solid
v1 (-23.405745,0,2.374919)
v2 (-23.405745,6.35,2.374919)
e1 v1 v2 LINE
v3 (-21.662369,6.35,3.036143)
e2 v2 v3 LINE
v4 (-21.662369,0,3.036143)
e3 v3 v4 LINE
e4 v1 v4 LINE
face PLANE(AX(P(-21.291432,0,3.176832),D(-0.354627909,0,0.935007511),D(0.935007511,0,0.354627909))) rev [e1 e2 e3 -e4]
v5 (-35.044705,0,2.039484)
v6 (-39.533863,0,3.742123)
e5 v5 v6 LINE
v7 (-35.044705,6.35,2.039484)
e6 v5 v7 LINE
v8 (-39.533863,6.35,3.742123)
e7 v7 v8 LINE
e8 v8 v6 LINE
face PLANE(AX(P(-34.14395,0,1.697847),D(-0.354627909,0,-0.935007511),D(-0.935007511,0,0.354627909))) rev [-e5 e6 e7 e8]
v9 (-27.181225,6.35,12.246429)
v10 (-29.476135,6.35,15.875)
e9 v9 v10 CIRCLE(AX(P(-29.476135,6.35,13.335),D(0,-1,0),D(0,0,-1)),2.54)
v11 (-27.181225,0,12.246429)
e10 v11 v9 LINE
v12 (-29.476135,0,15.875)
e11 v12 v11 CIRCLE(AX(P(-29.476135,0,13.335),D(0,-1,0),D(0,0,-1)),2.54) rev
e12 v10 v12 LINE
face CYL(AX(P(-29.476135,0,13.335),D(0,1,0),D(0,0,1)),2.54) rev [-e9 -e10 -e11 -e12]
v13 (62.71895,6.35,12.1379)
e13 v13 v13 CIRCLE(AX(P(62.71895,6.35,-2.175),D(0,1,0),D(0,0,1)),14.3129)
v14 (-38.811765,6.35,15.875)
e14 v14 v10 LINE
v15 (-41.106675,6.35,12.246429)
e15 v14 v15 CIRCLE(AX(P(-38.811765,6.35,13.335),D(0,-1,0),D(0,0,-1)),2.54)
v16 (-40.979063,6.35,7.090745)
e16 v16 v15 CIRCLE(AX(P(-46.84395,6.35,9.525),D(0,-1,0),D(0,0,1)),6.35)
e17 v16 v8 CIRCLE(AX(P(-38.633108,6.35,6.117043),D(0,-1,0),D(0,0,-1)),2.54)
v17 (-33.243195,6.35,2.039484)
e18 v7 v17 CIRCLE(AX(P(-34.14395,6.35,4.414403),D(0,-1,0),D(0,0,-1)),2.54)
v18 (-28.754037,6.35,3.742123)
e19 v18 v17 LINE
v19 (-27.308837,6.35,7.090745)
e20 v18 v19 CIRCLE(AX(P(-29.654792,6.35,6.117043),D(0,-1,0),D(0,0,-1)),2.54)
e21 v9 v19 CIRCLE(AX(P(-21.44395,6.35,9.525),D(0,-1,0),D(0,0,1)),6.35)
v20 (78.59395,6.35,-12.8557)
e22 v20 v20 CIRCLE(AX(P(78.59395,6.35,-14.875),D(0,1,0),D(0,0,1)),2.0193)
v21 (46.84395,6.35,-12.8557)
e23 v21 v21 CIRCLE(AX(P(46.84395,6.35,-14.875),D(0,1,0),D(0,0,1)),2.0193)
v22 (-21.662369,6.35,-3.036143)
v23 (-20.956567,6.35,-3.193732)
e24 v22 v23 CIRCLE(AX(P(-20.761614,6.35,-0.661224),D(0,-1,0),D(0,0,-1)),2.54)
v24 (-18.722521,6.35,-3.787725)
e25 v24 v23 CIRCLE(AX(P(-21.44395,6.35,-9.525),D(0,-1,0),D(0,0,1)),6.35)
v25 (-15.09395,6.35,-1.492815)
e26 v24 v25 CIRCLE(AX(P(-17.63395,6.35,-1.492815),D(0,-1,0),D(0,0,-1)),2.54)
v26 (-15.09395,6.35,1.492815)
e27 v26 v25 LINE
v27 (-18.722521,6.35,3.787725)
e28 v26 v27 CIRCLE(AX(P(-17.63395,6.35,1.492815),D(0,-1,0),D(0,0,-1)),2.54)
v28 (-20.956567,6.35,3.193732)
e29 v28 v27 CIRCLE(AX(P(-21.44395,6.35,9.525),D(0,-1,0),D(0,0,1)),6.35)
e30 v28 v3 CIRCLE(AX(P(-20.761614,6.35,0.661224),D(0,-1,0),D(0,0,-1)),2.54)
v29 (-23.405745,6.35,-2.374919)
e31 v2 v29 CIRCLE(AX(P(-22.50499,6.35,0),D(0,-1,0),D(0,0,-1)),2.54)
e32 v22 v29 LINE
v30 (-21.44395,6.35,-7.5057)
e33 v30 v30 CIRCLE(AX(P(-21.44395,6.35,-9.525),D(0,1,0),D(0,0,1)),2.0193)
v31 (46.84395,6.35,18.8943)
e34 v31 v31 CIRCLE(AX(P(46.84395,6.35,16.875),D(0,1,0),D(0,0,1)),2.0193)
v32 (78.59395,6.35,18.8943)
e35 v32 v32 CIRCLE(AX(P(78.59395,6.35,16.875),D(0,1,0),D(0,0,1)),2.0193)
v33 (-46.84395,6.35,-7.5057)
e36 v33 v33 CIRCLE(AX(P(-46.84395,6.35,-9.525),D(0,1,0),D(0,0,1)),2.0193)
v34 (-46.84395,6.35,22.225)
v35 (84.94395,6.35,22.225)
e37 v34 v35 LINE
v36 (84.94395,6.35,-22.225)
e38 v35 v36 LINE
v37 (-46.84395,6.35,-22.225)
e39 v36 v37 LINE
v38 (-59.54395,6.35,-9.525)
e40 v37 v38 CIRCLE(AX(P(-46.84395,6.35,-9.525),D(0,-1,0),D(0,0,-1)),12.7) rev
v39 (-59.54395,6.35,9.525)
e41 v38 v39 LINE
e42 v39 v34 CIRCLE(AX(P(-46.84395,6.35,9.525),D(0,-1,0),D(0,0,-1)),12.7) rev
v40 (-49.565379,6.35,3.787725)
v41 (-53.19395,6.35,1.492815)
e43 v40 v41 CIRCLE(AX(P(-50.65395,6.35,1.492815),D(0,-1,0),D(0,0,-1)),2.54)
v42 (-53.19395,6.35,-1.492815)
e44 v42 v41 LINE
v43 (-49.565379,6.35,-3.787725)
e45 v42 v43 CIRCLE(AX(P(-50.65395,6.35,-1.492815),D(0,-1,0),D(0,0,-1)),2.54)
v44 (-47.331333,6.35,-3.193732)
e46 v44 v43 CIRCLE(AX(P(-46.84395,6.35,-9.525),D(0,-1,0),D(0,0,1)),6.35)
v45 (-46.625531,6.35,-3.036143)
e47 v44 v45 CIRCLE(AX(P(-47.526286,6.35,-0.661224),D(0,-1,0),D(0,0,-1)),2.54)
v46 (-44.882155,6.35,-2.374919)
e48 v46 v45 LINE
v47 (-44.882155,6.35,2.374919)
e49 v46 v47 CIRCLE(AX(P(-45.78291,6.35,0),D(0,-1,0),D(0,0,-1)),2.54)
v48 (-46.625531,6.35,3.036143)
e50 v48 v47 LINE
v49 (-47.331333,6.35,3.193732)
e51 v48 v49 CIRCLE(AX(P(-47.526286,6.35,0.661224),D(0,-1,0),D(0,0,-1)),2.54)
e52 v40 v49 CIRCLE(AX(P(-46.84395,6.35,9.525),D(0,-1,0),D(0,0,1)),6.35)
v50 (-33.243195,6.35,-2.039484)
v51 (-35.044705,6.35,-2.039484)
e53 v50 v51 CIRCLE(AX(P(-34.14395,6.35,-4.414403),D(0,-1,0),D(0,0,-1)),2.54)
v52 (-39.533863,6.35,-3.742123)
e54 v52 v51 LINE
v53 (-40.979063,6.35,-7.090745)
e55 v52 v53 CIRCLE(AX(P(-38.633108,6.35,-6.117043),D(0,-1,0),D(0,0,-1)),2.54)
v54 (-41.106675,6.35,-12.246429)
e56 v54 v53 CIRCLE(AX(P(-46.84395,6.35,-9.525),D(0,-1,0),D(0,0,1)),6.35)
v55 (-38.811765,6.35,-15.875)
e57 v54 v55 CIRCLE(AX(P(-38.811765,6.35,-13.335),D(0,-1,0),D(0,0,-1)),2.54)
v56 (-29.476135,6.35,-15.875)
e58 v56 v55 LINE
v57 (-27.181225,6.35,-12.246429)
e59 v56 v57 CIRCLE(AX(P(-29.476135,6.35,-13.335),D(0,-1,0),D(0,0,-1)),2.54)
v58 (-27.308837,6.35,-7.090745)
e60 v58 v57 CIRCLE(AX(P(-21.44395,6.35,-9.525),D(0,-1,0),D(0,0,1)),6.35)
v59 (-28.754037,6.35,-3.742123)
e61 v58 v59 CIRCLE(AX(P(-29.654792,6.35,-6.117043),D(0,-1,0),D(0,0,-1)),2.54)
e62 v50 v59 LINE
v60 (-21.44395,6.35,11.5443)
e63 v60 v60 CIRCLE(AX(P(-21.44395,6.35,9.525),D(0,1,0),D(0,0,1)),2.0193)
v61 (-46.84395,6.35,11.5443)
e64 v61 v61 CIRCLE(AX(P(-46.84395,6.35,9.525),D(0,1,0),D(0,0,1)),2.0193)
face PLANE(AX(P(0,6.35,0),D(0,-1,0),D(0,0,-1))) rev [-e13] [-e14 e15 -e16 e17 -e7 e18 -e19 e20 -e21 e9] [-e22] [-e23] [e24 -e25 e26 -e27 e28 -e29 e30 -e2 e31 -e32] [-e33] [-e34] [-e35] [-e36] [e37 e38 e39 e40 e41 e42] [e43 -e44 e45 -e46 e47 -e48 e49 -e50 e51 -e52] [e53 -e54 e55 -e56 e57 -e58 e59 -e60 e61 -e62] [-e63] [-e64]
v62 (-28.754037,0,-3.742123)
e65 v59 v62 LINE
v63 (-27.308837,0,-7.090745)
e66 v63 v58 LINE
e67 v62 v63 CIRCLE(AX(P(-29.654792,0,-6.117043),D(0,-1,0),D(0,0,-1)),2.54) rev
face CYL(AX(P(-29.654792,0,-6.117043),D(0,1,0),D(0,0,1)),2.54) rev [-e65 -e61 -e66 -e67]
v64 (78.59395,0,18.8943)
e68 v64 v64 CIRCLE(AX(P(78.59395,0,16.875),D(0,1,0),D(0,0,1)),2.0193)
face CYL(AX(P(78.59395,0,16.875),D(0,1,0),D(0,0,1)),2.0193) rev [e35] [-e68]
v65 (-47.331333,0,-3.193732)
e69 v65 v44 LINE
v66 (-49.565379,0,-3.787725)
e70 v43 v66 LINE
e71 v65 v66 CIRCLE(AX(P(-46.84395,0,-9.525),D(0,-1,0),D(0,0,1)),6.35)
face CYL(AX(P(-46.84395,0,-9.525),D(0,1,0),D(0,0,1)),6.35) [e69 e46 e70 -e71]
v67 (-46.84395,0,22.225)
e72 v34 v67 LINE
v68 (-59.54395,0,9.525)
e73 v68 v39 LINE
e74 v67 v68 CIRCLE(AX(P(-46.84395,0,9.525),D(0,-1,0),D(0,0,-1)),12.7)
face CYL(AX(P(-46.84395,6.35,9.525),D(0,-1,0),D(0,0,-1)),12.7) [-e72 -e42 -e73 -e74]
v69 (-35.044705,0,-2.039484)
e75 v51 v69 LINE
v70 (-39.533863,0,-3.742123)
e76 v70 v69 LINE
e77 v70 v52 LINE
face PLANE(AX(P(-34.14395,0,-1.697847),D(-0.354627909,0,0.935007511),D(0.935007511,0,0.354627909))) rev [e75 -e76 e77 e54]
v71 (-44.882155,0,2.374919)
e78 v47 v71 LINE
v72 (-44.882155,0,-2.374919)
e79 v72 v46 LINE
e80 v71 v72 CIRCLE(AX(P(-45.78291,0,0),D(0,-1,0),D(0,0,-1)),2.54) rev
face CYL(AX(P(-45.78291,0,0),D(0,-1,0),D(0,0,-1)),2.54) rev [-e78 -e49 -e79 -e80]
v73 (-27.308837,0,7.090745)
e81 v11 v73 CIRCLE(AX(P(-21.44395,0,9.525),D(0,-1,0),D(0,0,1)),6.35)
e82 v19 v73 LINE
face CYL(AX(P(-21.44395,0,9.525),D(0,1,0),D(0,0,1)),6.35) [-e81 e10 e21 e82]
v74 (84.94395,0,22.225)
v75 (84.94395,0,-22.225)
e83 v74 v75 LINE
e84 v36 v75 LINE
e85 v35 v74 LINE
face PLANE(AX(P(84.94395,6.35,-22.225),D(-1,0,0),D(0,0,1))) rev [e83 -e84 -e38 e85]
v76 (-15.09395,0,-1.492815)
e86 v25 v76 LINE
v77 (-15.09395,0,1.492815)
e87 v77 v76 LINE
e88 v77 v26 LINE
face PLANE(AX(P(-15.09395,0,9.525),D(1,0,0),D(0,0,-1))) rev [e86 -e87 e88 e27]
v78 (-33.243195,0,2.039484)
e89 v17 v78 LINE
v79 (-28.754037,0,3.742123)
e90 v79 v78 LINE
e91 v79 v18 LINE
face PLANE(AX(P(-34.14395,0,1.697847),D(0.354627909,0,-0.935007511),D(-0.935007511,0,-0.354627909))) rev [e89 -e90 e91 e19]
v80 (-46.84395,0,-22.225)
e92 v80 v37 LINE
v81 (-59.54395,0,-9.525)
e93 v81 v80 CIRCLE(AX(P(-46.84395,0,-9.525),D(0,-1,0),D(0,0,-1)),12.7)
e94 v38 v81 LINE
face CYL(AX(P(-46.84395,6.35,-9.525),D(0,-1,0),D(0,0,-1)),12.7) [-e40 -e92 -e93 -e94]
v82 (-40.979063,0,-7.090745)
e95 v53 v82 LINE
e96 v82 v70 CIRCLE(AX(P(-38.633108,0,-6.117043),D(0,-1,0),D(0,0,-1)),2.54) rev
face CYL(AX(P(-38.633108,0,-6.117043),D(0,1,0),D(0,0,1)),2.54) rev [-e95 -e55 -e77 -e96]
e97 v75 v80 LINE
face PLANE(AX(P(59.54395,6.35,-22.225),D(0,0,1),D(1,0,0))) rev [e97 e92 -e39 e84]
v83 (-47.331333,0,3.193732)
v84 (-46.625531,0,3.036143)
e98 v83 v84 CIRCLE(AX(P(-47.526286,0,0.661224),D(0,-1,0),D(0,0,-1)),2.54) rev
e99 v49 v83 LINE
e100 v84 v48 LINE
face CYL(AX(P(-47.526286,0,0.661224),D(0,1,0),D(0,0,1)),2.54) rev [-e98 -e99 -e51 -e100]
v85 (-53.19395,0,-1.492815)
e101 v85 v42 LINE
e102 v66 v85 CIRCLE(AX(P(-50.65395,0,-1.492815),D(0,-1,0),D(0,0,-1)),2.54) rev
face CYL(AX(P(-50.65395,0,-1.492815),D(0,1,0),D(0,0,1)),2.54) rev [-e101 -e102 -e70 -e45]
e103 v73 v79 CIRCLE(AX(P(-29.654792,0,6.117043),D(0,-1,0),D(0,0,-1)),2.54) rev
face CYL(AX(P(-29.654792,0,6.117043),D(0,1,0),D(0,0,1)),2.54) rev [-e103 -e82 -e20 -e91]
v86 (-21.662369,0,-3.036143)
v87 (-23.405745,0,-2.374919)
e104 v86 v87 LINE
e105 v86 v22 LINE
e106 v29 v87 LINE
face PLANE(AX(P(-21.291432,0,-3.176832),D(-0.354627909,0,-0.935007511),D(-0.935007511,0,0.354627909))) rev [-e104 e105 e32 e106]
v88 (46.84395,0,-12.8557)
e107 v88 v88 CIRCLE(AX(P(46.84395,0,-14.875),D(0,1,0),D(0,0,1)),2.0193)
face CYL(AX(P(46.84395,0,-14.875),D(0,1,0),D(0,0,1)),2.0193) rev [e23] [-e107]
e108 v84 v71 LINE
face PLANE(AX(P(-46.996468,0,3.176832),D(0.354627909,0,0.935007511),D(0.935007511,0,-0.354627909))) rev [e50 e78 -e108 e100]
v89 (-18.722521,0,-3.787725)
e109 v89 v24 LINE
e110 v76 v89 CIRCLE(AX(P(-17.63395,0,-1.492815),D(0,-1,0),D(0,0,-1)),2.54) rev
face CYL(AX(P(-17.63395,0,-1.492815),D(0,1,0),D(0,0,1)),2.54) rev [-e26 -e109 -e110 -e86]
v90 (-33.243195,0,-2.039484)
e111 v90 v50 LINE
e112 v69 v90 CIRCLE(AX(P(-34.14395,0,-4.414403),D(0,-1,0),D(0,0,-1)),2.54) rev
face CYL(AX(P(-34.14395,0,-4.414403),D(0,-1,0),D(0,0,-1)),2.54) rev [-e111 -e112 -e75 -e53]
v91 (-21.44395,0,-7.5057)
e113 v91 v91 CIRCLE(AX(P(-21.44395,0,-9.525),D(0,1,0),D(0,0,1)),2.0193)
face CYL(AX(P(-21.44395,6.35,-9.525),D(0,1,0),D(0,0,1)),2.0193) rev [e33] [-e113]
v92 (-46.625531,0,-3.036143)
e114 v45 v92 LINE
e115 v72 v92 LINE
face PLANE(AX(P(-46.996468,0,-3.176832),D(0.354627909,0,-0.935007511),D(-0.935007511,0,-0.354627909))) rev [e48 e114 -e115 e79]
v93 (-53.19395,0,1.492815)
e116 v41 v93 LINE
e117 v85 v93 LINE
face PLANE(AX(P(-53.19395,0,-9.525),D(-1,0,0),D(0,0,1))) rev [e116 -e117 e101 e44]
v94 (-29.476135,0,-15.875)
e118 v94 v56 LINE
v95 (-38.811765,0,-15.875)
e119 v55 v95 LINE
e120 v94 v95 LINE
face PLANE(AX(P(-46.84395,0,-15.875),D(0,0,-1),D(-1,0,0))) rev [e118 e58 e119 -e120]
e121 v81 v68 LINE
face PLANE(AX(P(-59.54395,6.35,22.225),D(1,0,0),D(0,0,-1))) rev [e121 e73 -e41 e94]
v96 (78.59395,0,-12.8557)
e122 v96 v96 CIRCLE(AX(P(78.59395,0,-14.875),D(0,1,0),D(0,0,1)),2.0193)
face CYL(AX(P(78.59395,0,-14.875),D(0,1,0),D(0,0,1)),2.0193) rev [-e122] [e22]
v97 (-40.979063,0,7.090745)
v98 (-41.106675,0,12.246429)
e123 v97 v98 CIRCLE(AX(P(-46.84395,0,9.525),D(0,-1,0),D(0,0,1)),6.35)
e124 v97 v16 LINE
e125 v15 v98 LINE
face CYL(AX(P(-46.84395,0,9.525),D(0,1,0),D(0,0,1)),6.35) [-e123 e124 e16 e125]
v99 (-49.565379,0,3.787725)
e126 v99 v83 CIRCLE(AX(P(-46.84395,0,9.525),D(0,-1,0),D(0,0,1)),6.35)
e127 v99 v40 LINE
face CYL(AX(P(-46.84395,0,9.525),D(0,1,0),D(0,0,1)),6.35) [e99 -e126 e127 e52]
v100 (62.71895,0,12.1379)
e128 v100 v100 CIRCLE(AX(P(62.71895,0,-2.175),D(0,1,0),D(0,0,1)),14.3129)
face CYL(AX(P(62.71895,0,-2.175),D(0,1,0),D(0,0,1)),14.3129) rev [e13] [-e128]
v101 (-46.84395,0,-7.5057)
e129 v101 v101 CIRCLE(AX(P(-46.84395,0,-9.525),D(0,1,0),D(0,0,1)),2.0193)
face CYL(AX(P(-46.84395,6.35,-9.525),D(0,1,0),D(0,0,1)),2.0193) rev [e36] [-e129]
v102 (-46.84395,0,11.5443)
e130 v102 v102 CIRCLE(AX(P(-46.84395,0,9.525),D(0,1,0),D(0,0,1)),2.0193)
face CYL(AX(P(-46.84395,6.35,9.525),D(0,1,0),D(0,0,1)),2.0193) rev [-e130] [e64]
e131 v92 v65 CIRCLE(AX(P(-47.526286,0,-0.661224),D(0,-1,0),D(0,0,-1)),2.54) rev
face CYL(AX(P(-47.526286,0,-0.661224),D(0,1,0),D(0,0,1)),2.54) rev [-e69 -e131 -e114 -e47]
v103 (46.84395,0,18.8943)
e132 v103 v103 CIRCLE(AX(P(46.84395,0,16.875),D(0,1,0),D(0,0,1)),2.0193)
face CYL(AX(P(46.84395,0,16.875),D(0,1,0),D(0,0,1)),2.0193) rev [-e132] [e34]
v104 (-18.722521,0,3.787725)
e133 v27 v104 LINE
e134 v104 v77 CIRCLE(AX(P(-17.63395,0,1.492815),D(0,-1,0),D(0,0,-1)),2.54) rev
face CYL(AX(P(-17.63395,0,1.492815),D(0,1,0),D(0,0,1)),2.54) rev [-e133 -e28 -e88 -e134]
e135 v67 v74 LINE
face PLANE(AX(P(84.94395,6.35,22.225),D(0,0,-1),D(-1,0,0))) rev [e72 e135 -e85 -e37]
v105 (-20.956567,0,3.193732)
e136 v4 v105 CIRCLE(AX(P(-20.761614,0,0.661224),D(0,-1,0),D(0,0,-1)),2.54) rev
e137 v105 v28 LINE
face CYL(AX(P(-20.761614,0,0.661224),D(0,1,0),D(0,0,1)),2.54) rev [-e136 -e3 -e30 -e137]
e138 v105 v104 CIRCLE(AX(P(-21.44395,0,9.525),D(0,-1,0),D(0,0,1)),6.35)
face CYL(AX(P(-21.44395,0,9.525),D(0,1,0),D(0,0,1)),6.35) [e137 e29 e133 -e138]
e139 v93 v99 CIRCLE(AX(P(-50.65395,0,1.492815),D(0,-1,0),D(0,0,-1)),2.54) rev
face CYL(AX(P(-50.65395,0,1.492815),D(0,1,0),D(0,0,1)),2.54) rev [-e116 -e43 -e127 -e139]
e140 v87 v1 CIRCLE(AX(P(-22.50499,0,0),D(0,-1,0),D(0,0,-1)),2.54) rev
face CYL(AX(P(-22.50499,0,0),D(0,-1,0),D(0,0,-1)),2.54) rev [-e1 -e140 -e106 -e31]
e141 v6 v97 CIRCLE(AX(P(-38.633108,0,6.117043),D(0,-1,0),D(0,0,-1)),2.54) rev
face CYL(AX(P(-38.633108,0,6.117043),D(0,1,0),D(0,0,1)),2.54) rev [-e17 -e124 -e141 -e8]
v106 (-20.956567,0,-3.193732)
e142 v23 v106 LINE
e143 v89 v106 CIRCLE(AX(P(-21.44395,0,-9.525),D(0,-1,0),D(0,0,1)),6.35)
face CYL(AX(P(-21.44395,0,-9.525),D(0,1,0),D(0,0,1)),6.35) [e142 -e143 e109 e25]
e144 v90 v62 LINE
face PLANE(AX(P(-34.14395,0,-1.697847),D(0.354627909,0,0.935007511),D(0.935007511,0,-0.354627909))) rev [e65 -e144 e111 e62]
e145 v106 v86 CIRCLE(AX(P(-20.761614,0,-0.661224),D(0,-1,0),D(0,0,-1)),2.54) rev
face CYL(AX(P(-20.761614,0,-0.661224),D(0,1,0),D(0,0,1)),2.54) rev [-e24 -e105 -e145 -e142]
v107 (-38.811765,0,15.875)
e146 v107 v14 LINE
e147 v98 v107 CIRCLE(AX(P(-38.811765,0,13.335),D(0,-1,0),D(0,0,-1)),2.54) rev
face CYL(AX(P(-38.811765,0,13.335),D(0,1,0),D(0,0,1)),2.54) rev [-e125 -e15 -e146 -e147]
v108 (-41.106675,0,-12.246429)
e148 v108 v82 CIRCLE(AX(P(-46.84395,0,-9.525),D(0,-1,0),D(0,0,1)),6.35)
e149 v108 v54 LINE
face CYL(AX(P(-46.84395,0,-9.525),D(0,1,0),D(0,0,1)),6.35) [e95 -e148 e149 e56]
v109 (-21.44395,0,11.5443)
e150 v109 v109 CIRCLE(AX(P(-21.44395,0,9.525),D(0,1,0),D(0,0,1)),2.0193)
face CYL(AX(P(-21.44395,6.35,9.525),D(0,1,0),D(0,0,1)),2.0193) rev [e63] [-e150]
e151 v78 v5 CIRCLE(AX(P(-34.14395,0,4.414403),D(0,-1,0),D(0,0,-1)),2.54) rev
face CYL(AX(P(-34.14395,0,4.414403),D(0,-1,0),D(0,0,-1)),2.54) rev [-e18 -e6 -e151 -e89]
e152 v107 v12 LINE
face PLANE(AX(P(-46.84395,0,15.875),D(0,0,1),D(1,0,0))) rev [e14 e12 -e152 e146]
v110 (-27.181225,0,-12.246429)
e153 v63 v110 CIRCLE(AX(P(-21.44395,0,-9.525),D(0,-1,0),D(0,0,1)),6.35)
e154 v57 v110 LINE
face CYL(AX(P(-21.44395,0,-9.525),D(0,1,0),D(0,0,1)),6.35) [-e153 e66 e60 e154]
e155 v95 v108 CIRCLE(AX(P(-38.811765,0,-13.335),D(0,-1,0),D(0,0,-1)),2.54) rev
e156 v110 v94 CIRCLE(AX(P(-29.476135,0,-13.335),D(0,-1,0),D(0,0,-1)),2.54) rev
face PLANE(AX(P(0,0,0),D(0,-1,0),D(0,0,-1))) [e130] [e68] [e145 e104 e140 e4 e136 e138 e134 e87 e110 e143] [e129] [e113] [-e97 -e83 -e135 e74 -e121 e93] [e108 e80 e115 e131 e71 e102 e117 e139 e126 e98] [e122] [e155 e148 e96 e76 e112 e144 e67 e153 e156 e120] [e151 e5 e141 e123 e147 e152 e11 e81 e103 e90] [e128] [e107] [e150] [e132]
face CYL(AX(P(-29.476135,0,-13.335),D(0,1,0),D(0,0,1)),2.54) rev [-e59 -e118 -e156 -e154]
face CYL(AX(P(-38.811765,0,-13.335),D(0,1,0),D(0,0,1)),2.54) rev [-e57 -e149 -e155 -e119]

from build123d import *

# Parameters (mm, degrees)
BOSS_EXTRUDE1_DEPTH    = 6.35
F_10_32_TAPPED_HOLE2_D = 4.0386
FILLET2_R              = 12.7
CUT_EXTRUDE3_DEPTH     = 89.032651707
FILLET3_DEPTH          = 6.35
SKETCH12_R             = 14.3129
CUT_EXTRUDE4_DEPTH     = 89.032651707
SKETCH13_R             = 2.0193
CUT_EXTRUDE5_DEPTH     = 89.032651707


with BuildPart() as part:
    # Sketch1 → Boss-Extrude1 (new body)
    with BuildSketch(Plane(origin=(0, 0, 0), x_dir=(1, 0, 0), z_dir=(0, 1, 0))):
        Polygon((59.54395, 22.225), (84.94395, 22.225), (84.94395, -22.225), (59.54395, -22.225), (-59.54395, -22.225), (-59.54395, 22.225), align=None)
    extrude(amount=BOSS_EXTRUDE1_DEPTH)

    # #10-32 Tapped Hole2 (through all)
    with Locations(Plane(origin=(0, 6.35, 0), x_dir=(1, 0, 0), z_dir=(0, 1, 0))):
        with Locations((-46.84395, 9.525), (-21.44395, 9.525), (-21.44395, -9.525), (-46.84395, -9.525)):
            Hole(F_10_32_TAPPED_HOLE2_D / 2)

    # Fillet2
    fillet2_edges = [part.edges().sort_by_distance(p)[0] for p in [
        (-59.54395, 3.175, 22.225),
        (-59.54395, 3.175, -22.225),
    ]]
    fillet(fillet2_edges, radius=FILLET2_R)

    # Sketch11 → Cut-Extrude3 (cut, through all)
    with BuildSketch(Plane(origin=(0, 6.35, 0), x_dir=(1, 0, 0), z_dir=(0, 1, 0))):
        with BuildLine():
            Line((-46.84395, 15.875), (-21.44395, 15.875))
            ThreePointArc((-21.44395, 15.875), (-27.353773893, 11.848032834), (-25.767954708, 4.874679228))
            Line((-25.767954708, 4.874679228), (-34.14395, 1.697847323))
            Line((-34.14395, 1.697847323), (-42.519945292, 4.874679228))
            ThreePointArc((-42.519945292, 4.874679228), (-40.934126107, 11.848032834), (-46.84395, 15.875))
        make_face()
        with BuildLine():
            Line((-15.09395, -9.525), (-15.09395, 9.525))
            ThreePointArc((-15.09395, 9.525), (-16.90021853, 5.089123048), (-21.291431679, 3.176831905))
            Line((-21.291431679, 3.176831905), (-29.667426971, 0))
            Line((-29.667426971, 0), (-21.291431679, -3.176831905))
            ThreePointArc((-21.291431679, -3.176831905), (-16.90021853, -5.089123048), (-15.09395, -9.525))
        make_face()
        with BuildLine():
            Line((-53.19395, 9.525), (-53.19395, -9.525))
            ThreePointArc((-53.19395, -9.525), (-51.38768147, -5.089123048), (-46.996468321, -3.176831905))
            Line((-46.996468321, -3.176831905), (-38.620473029, 0))
            Line((-38.620473029, 0), (-46.996468321, 3.176831905))
            ThreePointArc((-46.996468321, 3.176831905), (-51.38768147, 5.089123048), (-53.19395, 9.525))
        make_face()
        with BuildLine():
            Line((-46.84395, -15.875), (-21.44395, -15.875))
            ThreePointArc((-21.44395, -15.875), (-27.353773893, -11.848032834), (-25.767954708, -4.874679228))
            Line((-25.767954708, -4.874679228), (-34.14395, -1.697847323))
            Line((-34.14395, -1.697847323), (-42.519945292, -4.874679228))
            ThreePointArc((-42.519945292, -4.874679228), (-40.934126107, -11.848032834), (-46.84395, -15.875))
        make_face()
    extrude(amount=-CUT_EXTRUDE3_DEPTH, mode=Mode.SUBTRACT)

    # Fillet3: read off the stored shape, not the designer's step
    # Fillet3 outline → Fillet3 (add)
    with BuildSketch(Plane(origin=(0, 0, 0), x_dir=(1, 0, 0), z_dir=(0, 1, 0))):
        with BuildLine():
            ThreePointArc((-18.722521429, 3.787724817), (-16.276262891, 3.63950655), (-15.09395, 1.492814743))
            Line((-15.09395, 1.492814743), (-15.09395, 9.525))
            ThreePointArc((-15.09395, 9.525), (-16.077220482, 6.130782227), (-18.722521429, 3.787724817))
        make_face()
        with BuildLine():
            Line((-15.09395, -9.525), (-15.09395, -1.492814743))
            ThreePointArc((-15.09395, -1.492814743), (-16.276262891, -3.63950655), (-18.722521429, -3.787724817))
            ThreePointArc((-18.722521429, -3.787724817), (-16.077220482, -6.130782227), (-15.09395, -9.525))
        make_face()
        with BuildLine():
            ThreePointArc((-21.662369003, 3.036143487), (-21.315105323, 3.140185377), (-20.956567225, 3.19373172))
            ThreePointArc((-20.956567225, 3.19373172), (-21.12388789, 3.183071252), (-21.291431679, 3.176831905))
            Line((-21.291431679, 3.176831905), (-21.662369003, 3.036143487))
        make_face()
        with BuildLine():
            ThreePointArc((-21.291431679, -3.176831905), (-21.12388789, -3.183071252), (-20.956567225, -3.19373172))
            ThreePointArc((-20.956567225, -3.19373172), (-21.315105323, -3.140185377), (-21.662369003, -3.036143487))
            Line((-21.662369003, -3.036143487), (-21.291431679, -3.176831905))
        make_face()
        with BuildLine():
            ThreePointArc((-23.405745013, -2.374919079), (-25.044990125, 0), (-23.405745013, 2.374919079))
            Line((-23.405745013, 2.374919079), (-29.667426971, 0))
            Line((-29.667426971, 0), (-23.405745013, -2.374919079))
        make_face()
        with BuildLine():
            ThreePointArc((-41.106674817, 12.246428571), (-40.95845655, 14.692687109), (-38.811764743, 15.875))
            Line((-38.811764743, 15.875), (-46.84395, 15.875))
            ThreePointArc((-46.84395, 15.875), (-43.449732228, 14.891729517), (-41.106674817, 12.246428571))
        make_face()
        with BuildLine():
            Line((-21.44395, 15.875), (-29.476135257, 15.875))
            ThreePointArc((-29.476135257, 15.875), (-27.32944345, 14.692687109), (-27.181225183, 12.246428571))
            ThreePointArc((-27.181225183, 12.246428571), (-24.838167772, 14.891729517), (-21.44395, 15.875))
        make_face()
        with BuildLine():
            ThreePointArc((-39.533862913, 3.742123461), (-40.965188005, 5.110562055), (-40.979062875, 7.090744671))
            ThreePointArc((-40.979062875, 7.090744671), (-41.630398839, 5.899895272), (-42.519945292, 4.874679228))
            Line((-42.519945292, 4.874679228), (-39.533862913, 3.742123461))
        make_face()
        with BuildLine():
            ThreePointArc((-25.767954708, 4.874679228), (-26.657501161, 5.899895272), (-27.308837125, 7.090744671))
            ThreePointArc((-27.308837125, 7.090744671), (-27.322711995, 5.110562055), (-28.754037087, 3.742123461))
            Line((-28.754037087, 3.742123461), (-25.767954708, 4.874679228))
        make_face()
        with BuildLine():
            ThreePointArc((-33.243195112, 2.03948396), (-34.14395, 1.874403039), (-35.044704888, 2.03948396))
            Line((-35.044704888, 2.03948396), (-34.14395, 1.697847323))
            Line((-34.14395, 1.697847323), (-33.243195112, 2.03948396))
        make_face()
        with BuildLine():
            Line((-38.620473029, 0), (-44.882154987, 2.374919079))
            ThreePointArc((-44.882154987, 2.374919079), (-43.242909875, 0), (-44.882154987, -2.374919079))
            Line((-44.882154987, -2.374919079), (-38.620473029, 0))
        make_face()
        with BuildLine():
            ThreePointArc((-47.331332775, 3.19373172), (-46.972794677, 3.140185377), (-46.625530997, 3.036143487))
            Line((-46.625530997, 3.036143487), (-46.996468321, 3.176831905))
            ThreePointArc((-46.996468321, 3.176831905), (-47.16401211, 3.183071252), (-47.331332775, 3.19373172))
        make_face()
        with BuildLine():
            Line((-46.996468321, -3.176831905), (-46.625530997, -3.036143487))
            ThreePointArc((-46.625530997, -3.036143487), (-46.972794677, -3.140185377), (-47.331332775, -3.19373172))
            ThreePointArc((-47.331332775, -3.19373172), (-47.16401211, -3.183071252), (-46.996468321, -3.176831905))
        make_face()
        with BuildLine():
            ThreePointArc((-53.19395, 1.492814743), (-52.011637109, 3.63950655), (-49.565378571, 3.787724817))
            ThreePointArc((-49.565378571, 3.787724817), (-52.210679518, 6.130782227), (-53.19395, 9.525))
            Line((-53.19395, 9.525), (-53.19395, 1.492814743))
        make_face()
        with BuildLine():
            ThreePointArc((-53.19395, -9.525), (-52.210679518, -6.130782227), (-49.565378571, -3.787724816))
            ThreePointArc((-49.565378571, -3.787724816), (-52.011637109, -3.63950655), (-53.19395, -1.492814743))
            Line((-53.19395, -1.492814743), (-53.19395, -9.525))
        make_face()
        with BuildLine():
            ThreePointArc((-40.979062875, -7.090744671), (-40.965188005, -5.110562055), (-39.533862913, -3.742123461))
            Line((-39.533862913, -3.742123461), (-42.519945292, -4.874679228))
            ThreePointArc((-42.519945292, -4.874679228), (-41.630398839, -5.899895272), (-40.979062875, -7.090744671))
        make_face()
        with BuildLine():
            Line((-34.14395, -1.697847323), (-35.044704888, -2.03948396))
            ThreePointArc((-35.044704888, -2.03948396), (-34.14395, -1.874403039), (-33.243195112, -2.03948396))
            Line((-33.243195112, -2.03948396), (-34.14395, -1.697847323))
        make_face()
        with BuildLine():
            ThreePointArc((-38.811764743, -15.875), (-40.95845655, -14.692687109), (-41.106674817, -12.246428571))
            ThreePointArc((-41.106674817, -12.246428571), (-43.449732228, -14.891729517), (-46.84395, -15.875))
            Line((-46.84395, -15.875), (-38.811764743, -15.875))
        make_face()
        with BuildLine():
            Line((-25.767954708, -4.874679228), (-28.754037087, -3.742123461))
            ThreePointArc((-28.754037087, -3.742123461), (-27.322711995, -5.110562055), (-27.308837125, -7.090744671))
            ThreePointArc((-27.308837125, -7.090744671), (-26.657501161, -5.899895272), (-25.767954708, -4.874679228))
        make_face()
        with BuildLine():
            ThreePointArc((-27.181225183, -12.246428571), (-27.32944345, -14.692687109), (-29.476135257, -15.875))
            Line((-29.476135257, -15.875), (-21.44395, -15.875))
            ThreePointArc((-21.44395, -15.875), (-24.838167772, -14.891729517), (-27.181225183, -12.246428571))
        make_face()
    extrude(amount=FILLET3_DEPTH)

    # Sketch12 → Cut-Extrude4 (cut, through all)
    with BuildSketch(Plane(origin=(0, 6.35, 0), x_dir=(1, 0, 0), z_dir=(0, 1, 0))):
        with Locations(Location((62.71895, 2.175, 0), (0, 0, 270))):
            Circle(SKETCH12_R)
    extrude(amount=-CUT_EXTRUDE4_DEPTH, mode=Mode.SUBTRACT)

    # Sketch13 → Cut-Extrude5 (cut, through all)
    with BuildSketch(Plane(origin=(0, 6.35, 0), x_dir=(1, 0, 0), z_dir=(0, 1, 0))):
        with Locations(Location((78.59395, 14.875, 0), (0, 0, 270))):
            Circle(SKETCH13_R)
        with Locations(Location((46.84395, 14.875, 0), (0, 0, 270))):
            Circle(SKETCH13_R)
        with Locations(Location((46.84395, -16.875, 0), (0, 0, 270))):
            Circle(SKETCH13_R)
        with Locations(Location((78.59395, -16.875, 0), (0, 0, 270))):
            Circle(SKETCH13_R)
    extrude(amount=-CUT_EXTRUDE5_DEPTH, mode=Mode.SUBTRACT)


solid = part.part
